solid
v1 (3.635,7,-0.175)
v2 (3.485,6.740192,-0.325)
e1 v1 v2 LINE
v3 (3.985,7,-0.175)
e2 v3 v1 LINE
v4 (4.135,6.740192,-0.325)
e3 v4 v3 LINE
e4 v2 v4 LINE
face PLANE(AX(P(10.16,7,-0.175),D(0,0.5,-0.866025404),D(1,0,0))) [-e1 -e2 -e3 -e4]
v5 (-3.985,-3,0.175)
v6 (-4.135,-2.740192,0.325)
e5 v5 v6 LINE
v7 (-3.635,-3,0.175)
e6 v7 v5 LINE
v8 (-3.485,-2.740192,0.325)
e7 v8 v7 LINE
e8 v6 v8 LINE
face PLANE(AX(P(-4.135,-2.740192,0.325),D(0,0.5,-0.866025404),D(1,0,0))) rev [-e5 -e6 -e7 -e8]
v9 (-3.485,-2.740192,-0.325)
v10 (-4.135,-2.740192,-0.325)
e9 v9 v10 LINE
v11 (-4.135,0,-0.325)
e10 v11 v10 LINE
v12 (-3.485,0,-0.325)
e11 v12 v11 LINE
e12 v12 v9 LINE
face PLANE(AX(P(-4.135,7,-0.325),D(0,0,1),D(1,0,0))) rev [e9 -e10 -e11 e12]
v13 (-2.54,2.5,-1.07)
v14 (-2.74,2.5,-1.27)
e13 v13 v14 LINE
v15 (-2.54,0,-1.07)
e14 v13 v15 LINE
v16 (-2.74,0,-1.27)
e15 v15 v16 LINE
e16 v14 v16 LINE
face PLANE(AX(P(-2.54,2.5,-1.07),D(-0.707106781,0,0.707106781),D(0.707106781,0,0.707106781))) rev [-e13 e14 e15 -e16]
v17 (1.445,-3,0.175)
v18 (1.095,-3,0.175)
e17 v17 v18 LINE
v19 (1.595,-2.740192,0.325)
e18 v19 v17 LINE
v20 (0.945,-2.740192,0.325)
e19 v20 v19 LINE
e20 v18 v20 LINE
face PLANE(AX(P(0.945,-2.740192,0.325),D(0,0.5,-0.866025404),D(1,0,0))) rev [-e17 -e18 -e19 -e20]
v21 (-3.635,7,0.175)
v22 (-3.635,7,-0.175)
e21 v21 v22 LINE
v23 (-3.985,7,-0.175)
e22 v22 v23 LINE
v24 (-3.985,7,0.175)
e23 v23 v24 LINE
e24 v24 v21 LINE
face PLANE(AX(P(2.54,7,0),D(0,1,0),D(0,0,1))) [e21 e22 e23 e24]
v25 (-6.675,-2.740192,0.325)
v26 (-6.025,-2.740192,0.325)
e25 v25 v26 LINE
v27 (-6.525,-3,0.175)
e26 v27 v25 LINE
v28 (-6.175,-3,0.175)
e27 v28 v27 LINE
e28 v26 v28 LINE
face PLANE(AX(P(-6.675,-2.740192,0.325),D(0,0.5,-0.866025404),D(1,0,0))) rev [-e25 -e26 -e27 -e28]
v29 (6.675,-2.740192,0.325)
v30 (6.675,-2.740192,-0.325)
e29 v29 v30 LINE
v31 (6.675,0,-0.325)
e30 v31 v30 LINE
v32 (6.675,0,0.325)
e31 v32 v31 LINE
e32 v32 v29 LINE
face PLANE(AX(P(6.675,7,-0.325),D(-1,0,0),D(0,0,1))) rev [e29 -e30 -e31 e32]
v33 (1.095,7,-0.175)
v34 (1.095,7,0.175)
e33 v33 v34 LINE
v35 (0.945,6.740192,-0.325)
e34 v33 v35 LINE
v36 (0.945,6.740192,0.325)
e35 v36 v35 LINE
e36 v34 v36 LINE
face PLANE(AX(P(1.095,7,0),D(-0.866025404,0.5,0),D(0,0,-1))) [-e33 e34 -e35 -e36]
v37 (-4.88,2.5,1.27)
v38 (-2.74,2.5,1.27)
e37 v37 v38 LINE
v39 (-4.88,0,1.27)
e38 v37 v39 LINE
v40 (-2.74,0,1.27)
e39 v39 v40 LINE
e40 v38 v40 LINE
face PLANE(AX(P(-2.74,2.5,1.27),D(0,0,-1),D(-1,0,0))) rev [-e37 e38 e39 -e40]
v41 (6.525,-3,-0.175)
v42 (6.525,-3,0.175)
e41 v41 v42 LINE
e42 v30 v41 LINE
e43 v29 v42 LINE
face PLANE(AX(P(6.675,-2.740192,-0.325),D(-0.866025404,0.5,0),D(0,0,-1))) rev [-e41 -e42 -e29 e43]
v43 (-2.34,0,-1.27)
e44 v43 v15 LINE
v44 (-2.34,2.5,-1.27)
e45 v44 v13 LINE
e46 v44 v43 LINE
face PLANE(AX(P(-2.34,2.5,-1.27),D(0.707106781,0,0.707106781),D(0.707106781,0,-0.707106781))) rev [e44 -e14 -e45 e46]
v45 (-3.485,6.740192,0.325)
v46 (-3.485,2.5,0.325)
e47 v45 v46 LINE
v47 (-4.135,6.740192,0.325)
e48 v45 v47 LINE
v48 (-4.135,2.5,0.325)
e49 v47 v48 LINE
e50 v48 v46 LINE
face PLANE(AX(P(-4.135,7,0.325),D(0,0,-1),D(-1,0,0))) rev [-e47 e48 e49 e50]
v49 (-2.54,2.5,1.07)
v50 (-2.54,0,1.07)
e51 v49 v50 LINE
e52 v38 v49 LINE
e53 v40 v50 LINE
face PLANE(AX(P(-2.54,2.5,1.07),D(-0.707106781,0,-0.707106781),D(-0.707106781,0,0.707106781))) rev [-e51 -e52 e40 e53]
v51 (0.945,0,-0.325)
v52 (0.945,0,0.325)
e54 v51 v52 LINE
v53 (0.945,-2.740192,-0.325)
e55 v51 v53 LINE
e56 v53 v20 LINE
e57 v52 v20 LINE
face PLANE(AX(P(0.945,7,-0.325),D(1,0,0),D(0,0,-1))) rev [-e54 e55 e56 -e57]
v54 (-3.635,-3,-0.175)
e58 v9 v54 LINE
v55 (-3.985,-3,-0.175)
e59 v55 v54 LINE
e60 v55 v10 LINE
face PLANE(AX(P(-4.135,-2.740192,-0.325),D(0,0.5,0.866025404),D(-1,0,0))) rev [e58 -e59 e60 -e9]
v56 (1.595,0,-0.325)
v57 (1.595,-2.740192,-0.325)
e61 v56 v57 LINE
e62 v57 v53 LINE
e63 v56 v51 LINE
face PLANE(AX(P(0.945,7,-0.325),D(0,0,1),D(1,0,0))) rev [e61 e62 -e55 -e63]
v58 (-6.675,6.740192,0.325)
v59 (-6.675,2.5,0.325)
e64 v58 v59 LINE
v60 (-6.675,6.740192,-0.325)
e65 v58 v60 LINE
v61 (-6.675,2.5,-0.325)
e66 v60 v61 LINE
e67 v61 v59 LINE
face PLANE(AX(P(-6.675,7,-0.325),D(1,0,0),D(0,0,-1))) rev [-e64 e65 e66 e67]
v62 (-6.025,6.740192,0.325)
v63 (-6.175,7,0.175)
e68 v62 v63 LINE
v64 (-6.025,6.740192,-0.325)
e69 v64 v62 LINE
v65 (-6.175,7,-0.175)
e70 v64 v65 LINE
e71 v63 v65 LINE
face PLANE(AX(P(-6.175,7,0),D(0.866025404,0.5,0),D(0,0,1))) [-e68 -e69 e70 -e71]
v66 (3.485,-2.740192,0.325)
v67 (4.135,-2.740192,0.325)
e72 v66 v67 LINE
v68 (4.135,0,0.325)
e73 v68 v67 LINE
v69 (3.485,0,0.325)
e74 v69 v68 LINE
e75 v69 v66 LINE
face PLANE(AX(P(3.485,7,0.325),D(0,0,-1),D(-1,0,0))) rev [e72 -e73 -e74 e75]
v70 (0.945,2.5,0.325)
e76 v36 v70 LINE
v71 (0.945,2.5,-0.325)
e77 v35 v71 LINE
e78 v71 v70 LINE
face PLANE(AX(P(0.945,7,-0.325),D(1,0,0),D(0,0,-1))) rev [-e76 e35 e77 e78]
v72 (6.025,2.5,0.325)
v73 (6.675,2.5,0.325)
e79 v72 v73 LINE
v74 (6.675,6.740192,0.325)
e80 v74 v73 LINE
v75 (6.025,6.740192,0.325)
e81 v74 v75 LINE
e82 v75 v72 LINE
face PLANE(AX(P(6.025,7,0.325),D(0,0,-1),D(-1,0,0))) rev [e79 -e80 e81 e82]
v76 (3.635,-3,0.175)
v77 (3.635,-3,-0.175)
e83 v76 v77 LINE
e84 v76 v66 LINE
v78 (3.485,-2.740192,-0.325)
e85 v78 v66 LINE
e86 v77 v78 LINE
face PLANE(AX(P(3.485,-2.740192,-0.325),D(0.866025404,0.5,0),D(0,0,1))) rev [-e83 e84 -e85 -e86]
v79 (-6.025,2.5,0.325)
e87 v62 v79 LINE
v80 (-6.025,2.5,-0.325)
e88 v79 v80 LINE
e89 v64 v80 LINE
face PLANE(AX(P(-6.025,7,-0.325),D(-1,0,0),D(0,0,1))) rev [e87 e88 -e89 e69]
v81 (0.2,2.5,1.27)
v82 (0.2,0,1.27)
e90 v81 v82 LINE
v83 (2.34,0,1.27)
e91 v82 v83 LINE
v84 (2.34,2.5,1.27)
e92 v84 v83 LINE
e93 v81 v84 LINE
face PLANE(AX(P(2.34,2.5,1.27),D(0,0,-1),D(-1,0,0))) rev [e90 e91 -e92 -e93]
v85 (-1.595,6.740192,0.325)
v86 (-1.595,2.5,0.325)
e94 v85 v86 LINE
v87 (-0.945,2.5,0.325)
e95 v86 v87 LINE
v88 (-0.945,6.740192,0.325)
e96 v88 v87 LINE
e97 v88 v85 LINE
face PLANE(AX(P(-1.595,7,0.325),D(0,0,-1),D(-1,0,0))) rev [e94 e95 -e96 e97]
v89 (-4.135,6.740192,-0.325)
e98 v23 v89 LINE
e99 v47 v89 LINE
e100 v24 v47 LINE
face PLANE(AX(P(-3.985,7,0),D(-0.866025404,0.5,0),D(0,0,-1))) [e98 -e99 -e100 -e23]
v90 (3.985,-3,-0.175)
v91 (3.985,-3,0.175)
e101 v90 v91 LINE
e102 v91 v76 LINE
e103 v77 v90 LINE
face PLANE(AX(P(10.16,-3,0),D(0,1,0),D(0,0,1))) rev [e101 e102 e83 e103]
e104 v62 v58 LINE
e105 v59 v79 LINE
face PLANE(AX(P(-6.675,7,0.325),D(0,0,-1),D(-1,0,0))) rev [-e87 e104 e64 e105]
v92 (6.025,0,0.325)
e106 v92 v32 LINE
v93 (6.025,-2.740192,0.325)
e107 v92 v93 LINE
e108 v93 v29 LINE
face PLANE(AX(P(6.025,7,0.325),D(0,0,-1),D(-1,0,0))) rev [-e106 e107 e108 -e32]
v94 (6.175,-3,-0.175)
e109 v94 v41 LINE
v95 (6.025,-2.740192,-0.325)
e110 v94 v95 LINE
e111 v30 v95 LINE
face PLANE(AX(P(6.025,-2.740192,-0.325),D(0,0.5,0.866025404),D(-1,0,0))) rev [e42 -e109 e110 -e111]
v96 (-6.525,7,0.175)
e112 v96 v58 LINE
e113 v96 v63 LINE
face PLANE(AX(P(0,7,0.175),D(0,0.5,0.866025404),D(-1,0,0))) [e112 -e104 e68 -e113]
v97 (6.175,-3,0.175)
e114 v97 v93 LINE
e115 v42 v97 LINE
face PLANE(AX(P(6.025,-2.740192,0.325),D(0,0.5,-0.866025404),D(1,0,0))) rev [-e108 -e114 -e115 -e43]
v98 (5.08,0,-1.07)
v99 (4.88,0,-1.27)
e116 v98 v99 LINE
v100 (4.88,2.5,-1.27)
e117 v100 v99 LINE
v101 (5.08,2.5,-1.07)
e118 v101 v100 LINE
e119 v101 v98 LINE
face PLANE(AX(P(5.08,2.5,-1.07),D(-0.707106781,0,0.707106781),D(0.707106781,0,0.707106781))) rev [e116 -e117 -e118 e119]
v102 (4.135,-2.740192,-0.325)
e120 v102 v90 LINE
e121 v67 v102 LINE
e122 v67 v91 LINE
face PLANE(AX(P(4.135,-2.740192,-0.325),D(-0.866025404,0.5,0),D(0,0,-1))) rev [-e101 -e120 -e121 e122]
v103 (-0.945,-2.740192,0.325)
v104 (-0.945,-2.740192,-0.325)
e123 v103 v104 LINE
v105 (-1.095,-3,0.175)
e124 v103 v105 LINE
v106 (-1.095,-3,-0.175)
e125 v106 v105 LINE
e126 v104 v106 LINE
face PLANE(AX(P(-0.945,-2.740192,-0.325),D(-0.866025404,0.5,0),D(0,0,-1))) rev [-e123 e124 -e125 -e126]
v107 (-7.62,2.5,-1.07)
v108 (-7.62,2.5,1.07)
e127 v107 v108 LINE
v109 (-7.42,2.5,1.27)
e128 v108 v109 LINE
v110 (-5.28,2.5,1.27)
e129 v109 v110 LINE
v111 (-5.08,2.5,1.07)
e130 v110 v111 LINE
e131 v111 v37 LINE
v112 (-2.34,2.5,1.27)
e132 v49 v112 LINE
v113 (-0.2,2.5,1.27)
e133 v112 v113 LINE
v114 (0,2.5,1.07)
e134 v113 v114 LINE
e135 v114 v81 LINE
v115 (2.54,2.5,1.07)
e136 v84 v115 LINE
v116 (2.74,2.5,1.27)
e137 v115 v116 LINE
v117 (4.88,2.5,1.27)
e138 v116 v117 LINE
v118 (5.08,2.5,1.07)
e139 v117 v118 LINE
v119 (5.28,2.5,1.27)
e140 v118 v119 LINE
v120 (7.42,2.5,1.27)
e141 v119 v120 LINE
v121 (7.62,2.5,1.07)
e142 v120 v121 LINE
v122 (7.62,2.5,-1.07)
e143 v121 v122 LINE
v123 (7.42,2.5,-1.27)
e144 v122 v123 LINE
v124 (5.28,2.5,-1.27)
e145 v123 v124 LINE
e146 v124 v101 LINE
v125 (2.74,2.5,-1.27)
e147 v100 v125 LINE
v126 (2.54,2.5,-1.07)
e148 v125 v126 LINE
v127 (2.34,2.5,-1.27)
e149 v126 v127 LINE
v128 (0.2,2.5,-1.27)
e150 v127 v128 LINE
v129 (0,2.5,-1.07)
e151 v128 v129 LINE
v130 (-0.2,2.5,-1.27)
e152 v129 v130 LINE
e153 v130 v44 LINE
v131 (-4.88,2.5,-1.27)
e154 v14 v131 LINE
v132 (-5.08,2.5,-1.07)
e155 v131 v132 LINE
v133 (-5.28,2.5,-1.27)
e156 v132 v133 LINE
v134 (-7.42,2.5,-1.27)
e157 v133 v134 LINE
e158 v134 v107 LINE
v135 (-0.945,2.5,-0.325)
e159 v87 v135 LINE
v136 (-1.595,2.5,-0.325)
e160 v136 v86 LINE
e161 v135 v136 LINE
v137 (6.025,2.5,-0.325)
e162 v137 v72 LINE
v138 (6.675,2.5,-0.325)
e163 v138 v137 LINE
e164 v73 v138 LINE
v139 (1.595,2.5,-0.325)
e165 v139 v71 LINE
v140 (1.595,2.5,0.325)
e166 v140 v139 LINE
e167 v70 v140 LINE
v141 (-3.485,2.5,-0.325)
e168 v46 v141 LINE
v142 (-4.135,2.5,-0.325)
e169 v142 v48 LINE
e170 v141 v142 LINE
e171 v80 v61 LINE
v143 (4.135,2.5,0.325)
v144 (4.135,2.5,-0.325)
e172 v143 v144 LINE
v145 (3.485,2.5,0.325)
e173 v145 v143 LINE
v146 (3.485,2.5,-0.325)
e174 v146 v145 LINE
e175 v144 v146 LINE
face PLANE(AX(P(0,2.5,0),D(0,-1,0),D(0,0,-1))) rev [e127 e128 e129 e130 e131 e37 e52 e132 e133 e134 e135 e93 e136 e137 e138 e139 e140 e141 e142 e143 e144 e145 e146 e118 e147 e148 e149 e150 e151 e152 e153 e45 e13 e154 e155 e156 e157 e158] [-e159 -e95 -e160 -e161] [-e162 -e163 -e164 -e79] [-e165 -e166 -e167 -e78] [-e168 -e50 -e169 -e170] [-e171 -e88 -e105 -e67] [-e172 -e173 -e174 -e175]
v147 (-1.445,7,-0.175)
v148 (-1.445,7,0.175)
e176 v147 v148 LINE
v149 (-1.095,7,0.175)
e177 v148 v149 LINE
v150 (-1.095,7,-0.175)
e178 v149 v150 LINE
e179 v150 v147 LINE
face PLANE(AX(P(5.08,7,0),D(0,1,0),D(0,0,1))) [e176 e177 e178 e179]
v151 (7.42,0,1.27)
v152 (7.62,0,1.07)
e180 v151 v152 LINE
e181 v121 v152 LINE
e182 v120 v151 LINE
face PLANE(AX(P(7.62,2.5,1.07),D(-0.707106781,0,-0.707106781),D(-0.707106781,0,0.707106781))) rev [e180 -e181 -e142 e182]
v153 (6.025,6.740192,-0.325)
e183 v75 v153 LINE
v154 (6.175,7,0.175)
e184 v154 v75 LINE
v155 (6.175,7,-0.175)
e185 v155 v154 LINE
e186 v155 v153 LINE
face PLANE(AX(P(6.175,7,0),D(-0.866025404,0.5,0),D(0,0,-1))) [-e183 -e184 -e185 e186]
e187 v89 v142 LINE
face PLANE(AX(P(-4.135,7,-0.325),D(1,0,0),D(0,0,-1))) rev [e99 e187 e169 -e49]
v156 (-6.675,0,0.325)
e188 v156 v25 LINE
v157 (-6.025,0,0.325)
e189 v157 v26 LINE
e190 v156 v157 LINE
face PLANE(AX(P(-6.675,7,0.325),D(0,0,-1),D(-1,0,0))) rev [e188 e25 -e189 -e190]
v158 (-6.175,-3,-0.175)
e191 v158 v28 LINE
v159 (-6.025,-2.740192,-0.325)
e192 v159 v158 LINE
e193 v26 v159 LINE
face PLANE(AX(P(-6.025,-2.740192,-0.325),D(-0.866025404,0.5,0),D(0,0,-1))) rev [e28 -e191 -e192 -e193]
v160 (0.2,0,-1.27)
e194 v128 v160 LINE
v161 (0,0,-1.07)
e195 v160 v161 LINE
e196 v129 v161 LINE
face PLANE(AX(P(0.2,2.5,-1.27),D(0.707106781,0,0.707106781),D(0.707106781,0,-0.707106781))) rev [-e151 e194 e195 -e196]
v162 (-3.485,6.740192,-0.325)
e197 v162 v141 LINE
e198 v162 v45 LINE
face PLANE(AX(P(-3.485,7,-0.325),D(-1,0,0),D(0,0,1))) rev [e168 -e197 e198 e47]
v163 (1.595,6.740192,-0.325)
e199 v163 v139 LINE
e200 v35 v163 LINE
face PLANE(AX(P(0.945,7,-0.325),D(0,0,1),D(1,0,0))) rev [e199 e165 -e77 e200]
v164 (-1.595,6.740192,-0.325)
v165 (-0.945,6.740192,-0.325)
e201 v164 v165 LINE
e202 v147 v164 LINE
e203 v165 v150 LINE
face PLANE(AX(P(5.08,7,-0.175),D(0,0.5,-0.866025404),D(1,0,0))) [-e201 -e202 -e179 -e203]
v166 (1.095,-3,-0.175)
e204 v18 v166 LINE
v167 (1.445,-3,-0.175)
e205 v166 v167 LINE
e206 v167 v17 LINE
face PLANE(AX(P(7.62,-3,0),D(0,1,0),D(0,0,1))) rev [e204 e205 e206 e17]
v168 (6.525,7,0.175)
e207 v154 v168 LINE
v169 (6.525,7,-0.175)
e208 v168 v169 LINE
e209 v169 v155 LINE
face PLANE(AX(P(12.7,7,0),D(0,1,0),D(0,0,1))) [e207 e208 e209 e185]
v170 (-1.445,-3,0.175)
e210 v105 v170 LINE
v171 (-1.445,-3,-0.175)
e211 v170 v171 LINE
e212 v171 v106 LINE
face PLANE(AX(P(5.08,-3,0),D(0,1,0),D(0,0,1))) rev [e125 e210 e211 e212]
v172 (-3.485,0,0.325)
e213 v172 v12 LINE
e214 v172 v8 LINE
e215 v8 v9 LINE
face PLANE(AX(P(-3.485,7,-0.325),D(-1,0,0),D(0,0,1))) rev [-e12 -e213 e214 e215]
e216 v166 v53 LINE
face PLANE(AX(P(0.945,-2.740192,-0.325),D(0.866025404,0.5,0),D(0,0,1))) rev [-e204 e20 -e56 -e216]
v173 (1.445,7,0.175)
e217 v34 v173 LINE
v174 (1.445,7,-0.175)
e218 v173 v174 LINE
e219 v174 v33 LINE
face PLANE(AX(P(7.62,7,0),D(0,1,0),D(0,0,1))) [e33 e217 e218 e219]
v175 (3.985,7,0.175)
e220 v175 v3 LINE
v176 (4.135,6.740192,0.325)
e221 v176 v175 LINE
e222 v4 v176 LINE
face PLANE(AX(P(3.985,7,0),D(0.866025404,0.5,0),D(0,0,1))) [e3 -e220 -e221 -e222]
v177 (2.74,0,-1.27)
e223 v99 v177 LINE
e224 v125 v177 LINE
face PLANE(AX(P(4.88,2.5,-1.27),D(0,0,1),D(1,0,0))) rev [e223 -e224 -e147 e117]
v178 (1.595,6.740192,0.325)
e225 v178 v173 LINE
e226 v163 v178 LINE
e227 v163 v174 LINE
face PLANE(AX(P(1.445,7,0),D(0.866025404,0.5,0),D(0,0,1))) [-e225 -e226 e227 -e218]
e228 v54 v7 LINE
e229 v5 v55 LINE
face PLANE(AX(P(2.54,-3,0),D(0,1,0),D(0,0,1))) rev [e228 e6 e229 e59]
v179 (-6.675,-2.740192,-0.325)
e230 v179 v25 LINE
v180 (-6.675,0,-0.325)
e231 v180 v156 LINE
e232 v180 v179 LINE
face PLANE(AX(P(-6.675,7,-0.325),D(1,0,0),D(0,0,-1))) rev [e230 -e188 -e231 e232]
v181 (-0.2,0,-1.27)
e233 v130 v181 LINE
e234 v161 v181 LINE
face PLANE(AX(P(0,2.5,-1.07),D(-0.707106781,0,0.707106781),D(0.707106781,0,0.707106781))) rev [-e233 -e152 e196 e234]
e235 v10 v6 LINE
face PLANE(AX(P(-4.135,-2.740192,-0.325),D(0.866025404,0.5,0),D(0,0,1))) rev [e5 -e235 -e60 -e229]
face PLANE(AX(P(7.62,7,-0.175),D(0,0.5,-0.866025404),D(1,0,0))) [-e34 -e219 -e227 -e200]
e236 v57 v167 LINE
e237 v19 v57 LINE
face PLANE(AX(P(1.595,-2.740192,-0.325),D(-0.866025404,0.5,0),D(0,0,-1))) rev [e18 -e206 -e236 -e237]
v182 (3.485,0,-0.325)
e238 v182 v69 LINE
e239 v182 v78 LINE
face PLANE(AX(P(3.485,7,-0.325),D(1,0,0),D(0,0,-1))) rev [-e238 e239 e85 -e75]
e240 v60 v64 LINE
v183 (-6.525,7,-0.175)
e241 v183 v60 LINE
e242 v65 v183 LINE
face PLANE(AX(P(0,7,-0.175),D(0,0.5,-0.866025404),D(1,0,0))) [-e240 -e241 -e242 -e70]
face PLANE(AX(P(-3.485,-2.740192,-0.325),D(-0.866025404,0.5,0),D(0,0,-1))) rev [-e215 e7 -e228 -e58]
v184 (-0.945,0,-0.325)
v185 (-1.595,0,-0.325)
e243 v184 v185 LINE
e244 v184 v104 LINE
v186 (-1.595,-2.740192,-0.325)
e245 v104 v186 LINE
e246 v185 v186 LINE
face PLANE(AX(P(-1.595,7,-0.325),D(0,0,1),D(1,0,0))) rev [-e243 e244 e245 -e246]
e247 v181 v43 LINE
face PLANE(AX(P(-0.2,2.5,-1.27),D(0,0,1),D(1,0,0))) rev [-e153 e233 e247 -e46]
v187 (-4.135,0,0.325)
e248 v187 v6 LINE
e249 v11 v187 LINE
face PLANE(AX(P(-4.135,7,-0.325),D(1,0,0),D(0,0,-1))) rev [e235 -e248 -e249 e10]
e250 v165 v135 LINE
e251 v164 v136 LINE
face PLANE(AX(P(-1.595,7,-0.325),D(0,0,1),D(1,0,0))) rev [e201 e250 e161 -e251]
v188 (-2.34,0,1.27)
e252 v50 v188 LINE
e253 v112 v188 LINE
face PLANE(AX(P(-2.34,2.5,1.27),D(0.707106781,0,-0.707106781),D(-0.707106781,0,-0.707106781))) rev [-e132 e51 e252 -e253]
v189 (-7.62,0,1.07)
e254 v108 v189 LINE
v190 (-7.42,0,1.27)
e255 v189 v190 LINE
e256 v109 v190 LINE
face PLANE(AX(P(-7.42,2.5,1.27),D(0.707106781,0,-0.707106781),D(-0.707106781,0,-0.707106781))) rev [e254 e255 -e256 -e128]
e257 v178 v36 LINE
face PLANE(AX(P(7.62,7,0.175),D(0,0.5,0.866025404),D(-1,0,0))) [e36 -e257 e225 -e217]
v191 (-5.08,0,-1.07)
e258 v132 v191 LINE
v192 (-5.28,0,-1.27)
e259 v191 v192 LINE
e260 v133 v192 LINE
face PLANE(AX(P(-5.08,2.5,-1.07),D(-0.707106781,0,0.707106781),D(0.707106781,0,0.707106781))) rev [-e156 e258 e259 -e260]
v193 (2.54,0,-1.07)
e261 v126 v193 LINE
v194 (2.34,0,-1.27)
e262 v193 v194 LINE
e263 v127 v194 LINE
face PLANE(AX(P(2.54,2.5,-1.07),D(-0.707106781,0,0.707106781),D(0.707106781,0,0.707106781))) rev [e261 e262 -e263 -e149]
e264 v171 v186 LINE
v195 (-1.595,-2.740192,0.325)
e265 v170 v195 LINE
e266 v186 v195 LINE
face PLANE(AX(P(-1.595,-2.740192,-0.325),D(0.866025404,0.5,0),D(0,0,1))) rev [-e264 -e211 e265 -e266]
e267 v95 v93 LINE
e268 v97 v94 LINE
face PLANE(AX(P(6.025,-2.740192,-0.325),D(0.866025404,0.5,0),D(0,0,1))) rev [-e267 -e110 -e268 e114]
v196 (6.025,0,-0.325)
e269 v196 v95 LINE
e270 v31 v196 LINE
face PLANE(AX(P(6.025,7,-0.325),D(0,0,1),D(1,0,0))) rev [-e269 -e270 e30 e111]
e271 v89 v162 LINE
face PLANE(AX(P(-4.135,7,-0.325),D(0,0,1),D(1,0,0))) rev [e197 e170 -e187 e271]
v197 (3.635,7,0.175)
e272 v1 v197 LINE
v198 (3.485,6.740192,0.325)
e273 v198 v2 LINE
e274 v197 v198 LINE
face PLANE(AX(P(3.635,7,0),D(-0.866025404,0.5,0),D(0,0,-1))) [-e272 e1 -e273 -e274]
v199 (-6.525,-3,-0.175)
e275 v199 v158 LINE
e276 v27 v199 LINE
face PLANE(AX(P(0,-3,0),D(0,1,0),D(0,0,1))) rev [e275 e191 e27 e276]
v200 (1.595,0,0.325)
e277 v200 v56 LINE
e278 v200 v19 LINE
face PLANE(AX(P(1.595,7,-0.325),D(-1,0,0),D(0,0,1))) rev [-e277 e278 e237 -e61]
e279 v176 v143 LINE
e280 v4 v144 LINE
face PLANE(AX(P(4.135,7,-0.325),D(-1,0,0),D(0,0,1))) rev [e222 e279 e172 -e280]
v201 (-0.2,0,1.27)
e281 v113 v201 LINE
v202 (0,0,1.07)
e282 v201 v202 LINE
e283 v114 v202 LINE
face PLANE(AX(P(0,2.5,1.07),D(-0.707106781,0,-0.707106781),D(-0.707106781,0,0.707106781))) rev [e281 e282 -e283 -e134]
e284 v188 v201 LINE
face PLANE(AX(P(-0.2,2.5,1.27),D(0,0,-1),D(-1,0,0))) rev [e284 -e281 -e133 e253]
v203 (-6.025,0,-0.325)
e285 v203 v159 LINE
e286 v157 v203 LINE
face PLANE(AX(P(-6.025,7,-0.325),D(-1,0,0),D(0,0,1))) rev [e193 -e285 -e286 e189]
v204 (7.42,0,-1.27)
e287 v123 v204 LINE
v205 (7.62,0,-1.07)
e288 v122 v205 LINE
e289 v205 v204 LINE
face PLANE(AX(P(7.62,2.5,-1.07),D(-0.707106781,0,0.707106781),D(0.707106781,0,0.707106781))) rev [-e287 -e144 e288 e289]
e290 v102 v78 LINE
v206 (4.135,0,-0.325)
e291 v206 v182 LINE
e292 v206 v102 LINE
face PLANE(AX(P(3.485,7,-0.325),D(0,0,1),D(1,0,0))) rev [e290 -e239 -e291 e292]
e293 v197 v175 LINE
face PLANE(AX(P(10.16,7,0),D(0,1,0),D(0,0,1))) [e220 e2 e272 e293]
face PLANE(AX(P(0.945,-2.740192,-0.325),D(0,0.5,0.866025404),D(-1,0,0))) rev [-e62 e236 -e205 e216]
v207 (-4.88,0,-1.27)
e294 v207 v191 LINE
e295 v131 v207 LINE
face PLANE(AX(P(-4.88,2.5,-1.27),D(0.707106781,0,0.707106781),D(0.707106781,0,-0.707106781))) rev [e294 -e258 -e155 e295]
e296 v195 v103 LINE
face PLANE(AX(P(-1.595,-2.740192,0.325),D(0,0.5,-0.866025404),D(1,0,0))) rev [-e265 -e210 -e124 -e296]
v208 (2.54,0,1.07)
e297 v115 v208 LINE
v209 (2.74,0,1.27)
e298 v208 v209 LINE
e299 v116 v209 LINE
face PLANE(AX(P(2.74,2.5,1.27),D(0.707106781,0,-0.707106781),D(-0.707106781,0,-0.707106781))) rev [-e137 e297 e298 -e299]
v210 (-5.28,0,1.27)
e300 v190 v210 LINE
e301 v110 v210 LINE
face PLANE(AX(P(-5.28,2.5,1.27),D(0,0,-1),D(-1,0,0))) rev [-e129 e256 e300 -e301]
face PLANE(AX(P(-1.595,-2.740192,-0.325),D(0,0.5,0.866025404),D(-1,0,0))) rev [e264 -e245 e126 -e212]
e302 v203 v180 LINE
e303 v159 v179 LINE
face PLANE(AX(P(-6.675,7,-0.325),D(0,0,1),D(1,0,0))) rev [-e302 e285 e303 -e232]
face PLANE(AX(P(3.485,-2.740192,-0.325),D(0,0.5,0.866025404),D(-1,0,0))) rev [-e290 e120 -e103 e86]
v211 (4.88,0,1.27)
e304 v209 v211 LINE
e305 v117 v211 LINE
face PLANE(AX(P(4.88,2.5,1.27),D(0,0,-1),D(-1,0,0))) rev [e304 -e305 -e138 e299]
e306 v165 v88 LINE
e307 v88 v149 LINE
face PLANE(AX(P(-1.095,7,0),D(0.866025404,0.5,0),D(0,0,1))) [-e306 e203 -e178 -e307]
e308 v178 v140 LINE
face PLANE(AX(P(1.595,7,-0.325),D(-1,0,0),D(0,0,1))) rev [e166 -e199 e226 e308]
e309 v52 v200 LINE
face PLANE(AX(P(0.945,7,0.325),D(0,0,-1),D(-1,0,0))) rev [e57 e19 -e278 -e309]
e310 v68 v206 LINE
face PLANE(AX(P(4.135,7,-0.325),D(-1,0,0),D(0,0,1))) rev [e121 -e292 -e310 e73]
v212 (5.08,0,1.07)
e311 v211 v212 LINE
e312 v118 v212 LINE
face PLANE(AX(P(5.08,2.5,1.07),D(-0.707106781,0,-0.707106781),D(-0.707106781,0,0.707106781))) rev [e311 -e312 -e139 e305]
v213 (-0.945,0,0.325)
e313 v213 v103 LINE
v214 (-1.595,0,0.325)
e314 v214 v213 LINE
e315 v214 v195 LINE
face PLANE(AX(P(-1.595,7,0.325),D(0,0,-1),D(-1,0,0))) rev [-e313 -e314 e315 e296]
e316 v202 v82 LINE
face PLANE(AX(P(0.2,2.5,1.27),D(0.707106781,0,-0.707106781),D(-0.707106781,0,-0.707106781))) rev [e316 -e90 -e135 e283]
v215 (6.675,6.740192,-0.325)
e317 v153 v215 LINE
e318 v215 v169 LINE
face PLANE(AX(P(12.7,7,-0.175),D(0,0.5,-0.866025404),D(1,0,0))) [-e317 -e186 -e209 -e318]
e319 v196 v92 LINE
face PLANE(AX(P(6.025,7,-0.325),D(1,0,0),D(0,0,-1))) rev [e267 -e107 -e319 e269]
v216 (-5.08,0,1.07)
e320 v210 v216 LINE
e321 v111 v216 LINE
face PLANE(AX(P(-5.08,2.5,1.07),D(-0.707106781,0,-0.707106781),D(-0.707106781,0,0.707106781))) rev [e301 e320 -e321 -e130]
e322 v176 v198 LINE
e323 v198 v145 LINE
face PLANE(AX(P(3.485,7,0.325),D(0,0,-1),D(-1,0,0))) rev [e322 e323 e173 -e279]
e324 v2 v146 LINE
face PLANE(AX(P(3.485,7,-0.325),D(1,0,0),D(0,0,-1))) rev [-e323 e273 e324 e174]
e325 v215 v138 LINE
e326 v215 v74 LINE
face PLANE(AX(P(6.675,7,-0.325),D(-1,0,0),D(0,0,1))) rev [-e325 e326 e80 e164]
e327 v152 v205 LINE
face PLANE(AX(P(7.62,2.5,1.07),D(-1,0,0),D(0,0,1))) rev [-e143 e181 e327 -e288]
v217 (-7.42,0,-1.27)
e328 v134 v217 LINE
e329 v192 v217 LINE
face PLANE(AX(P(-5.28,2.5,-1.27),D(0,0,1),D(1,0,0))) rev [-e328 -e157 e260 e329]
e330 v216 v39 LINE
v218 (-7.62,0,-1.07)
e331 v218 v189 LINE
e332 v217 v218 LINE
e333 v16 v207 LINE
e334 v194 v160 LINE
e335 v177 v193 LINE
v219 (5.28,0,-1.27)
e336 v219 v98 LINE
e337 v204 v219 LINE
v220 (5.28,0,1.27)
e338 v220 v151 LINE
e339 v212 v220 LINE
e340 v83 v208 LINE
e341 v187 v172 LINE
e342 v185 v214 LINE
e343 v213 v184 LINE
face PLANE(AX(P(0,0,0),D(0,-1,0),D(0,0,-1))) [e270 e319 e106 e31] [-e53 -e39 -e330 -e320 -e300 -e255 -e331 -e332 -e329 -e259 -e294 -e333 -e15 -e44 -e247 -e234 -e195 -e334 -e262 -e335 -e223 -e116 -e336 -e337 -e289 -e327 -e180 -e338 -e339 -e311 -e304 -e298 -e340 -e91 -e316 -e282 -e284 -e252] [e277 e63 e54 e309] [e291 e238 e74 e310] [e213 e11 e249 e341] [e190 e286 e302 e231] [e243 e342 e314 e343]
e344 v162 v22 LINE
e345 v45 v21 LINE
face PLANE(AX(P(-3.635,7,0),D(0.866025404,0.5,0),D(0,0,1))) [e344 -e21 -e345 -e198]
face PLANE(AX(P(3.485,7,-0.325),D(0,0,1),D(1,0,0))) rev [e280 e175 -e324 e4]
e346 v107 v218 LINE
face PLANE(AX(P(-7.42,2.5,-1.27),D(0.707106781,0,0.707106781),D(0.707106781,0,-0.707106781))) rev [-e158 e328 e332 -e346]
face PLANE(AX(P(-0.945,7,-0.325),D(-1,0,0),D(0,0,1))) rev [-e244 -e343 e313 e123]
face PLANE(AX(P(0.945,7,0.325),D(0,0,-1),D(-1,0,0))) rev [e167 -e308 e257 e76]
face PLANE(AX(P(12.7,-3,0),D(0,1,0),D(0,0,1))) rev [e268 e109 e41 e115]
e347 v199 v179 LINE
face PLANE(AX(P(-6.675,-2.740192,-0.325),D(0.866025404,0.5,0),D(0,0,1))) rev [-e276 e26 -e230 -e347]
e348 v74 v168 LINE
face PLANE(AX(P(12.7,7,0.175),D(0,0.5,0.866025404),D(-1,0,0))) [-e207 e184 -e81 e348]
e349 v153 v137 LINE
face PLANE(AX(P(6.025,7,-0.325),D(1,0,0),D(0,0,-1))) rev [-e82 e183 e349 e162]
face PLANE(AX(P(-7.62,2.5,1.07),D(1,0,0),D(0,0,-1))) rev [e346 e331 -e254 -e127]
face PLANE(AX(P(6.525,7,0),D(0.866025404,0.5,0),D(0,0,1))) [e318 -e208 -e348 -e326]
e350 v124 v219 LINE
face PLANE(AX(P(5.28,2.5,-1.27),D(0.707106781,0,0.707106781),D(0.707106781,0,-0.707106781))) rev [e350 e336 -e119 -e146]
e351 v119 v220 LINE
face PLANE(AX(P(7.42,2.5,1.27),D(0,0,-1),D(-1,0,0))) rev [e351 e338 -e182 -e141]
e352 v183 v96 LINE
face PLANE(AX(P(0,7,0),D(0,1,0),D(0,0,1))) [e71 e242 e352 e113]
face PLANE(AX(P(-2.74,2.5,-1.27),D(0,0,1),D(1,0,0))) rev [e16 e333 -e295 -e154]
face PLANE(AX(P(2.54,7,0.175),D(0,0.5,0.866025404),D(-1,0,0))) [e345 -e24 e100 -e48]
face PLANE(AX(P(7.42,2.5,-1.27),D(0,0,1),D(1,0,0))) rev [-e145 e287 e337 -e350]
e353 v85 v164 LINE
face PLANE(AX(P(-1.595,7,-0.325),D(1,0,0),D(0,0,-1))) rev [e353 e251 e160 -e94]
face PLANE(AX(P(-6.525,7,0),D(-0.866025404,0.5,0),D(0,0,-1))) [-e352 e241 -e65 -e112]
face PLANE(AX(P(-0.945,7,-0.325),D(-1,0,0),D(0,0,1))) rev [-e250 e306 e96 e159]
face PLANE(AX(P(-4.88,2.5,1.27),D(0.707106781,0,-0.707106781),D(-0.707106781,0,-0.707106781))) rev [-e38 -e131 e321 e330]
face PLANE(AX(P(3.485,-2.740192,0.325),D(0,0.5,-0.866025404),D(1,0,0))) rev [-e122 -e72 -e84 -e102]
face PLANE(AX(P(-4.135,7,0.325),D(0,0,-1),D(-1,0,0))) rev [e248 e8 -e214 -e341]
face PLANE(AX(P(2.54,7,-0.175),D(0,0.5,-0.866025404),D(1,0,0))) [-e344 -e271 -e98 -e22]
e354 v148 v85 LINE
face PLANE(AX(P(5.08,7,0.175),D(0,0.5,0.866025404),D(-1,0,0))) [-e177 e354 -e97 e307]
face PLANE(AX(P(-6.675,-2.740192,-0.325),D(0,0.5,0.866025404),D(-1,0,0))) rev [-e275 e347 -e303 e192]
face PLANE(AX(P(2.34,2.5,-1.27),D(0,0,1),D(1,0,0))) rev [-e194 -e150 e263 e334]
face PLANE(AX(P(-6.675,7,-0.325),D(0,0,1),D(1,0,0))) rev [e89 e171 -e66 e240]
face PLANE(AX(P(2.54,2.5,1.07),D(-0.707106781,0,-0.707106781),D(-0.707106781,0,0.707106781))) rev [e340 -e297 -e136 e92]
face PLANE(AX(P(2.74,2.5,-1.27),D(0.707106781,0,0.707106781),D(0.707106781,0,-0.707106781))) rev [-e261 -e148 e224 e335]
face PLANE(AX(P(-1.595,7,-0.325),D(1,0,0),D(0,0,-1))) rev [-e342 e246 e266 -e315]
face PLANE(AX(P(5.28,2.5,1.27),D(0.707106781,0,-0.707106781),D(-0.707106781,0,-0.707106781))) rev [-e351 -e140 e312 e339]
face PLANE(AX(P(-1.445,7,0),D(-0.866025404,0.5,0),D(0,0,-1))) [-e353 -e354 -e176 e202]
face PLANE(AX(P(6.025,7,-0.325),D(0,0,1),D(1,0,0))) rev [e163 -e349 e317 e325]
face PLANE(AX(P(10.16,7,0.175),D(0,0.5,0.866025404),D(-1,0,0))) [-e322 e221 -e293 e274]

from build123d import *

# Parameters (mm, degrees)
BOSS_EXTRUDE1_DEPTH   = 2.5
SKETCH3_W             = 0.65
SKETCH3_H             = 0.65
BOSS_EXTRUDE2_DEPTH   = 10
CHAMFER2_SIZE         = 0.15
CHAMFER2_SIZE2        = 0.259807621
CHAMFER3_SIZE         = 0.15
CHAMFER3_SIZE2        = 0.259807621
LPATTERN2_DEPTH       = 2.5
LPATTERN2_START       = -2.740192379
LPATTERN2_2_OUTLINE_W = 0.65
LPATTERN2_2_OUTLINE_H = 0.65
LPATTERN2_2_DEPTH     = 9.480384758


with BuildPart() as part:
    # Sketch1 → Boss-Extrude1 (new body)
    with BuildSketch(Plane(origin=(0, 0, 0), x_dir=(1, 0, 0), z_dir=(0, 1, 0))):
        Polygon((-7.42, 1.27), (-7.62, 1.07), (-7.62, -1.07), (-7.42, -1.27), (-5.28, -1.27), (-5.08, -1.07), (-5.08, 1.07), (-5.28, 1.27), align=None)
    extrude(amount=BOSS_EXTRUDE1_DEPTH)

    # Sketch3 → Boss-Extrude2 (add)
    with BuildSketch(Plane(origin=(0, -3, 0), x_dir=(1, 0, 0), z_dir=(0, 1, 0))):
        with Locations((-6.35, 0)):
            Rectangle(SKETCH3_W, SKETCH3_H)
    extrude(amount=BOSS_EXTRUDE2_DEPTH)

    # Chamfer2
    chamfer2_edges = [part.edges().sort_by_distance(p)[0] for p in [
        (-6.025, -3, 0),
        (-6.35, -3, -0.325),
        (-6.675, -3, 0),
        (-6.35, -3, 0.325),
    ]]
    chamfer2_side = [part.faces().sort_by_distance(p)[0] for p in [
        (-6.35, -3, 0),
    ]]
    chamfer(chamfer2_edges, length=CHAMFER2_SIZE, length2=CHAMFER2_SIZE2, reference=chamfer2_side[0])

    # Chamfer3
    chamfer3_edges = [part.edges().sort_by_distance(p)[0] for p in [
        (-6.025, 7, 0),
        (-6.35, 7, -0.325),
        (-6.675, 7, 0),
        (-6.35, 7, 0.325),
    ]]
    chamfer3_side = [part.faces().sort_by_distance(p)[0] for p in [
        (-6.35, 7, 0),
    ]]
    chamfer(chamfer3_edges, length=CHAMFER3_SIZE, length2=CHAMFER3_SIZE2, reference=chamfer3_side[0])

    # LPattern2: read off the stored shape, not the designer's step
    # LPattern2 outline → LPattern2 (add)
    with BuildSketch(Plane(origin=(0, 0, 0), x_dir=(1, 0, 0), z_dir=(0, 1, 0))):
        Polygon((-2.74, 1.27), (-4.88, 1.27), (-5.08, 1.07), (-5.08, -1.07), (-4.88, -1.27), (-2.74, -1.27), (-2.54, -1.07), (-2.34, -1.27), (-0.2, -1.27), (0, -1.07), (0.2, -1.27), (2.34, -1.27), (2.54, -1.07), (2.74, -1.27), (4.88, -1.27), (5.08, -1.07), (5.28, -1.27), (7.42, -1.27), (7.62, -1.07), (7.62, 1.07), (7.42, 1.27), (5.28, 1.27), (5.08, 1.07), (4.88, 1.27), (2.74, 1.27), (2.54, 1.07), (2.34, 1.27), (0.2, 1.27), (0, 1.07), (-0.2, 1.27), (-2.34, 1.27), (-2.54, 1.07), align=None)
    extrude(amount=LPATTERN2_DEPTH)

    # LPattern2 2 outline → LPattern2 2 (add)
    with BuildSketch(Plane(origin=(0, 0, 0), x_dir=(1, 0, 0), z_dir=(0, 1, 0)).offset(LPATTERN2_START)):
        with Locations((-3.81, 0)):
            Rectangle(LPATTERN2_2_OUTLINE_W, LPATTERN2_2_OUTLINE_H)
        with Locations((-1.27, 0)):
            Rectangle(LPATTERN2_2_OUTLINE_W, LPATTERN2_2_OUTLINE_H)
        with Locations((1.27, 0)):
            Rectangle(LPATTERN2_2_OUTLINE_W, LPATTERN2_2_OUTLINE_H)
        with Locations((3.81, 0)):
            Rectangle(LPATTERN2_2_OUTLINE_W, LPATTERN2_2_OUTLINE_H)
        with Locations((6.35, 0)):
            Rectangle(LPATTERN2_2_OUTLINE_W, LPATTERN2_2_OUTLINE_H)
    extrude(amount=LPATTERN2_2_DEPTH)

    # LPattern2 3: loft between two sections, ruled curve by curve
    lpattern2_3_from = [
        Edge.make_line((-3.985, -3, 0.175), (-3.635, -3, 0.175)),
        Edge.make_line((-3.635, -3, -0.175), (-3.985, -3, -0.175)),
        Edge.make_line((-3.635, -3, 0.175), (-3.635, -3, -0.175)),
        Edge.make_line((-3.985, -3, 0.175), (-3.985, -3, -0.175)),
    ]
    lpattern2_3_to = [
        Edge.make_line((-4.135, -2.740192379, 0.325), (-3.485, -2.740192379, 0.325)),
        Edge.make_line((-3.485, -2.740192379, -0.325), (-4.135, -2.740192379, -0.325)),
        Edge.make_line((-3.485, -2.740192379, 0.325), (-3.485, -2.740192379, -0.325)),
        Edge.make_line((-4.135, -2.740192379, 0.325), (-4.135, -2.740192379, -0.325)),
    ]
    lpattern2_3 = Solid(Shell([*[Face.make_surface_from_curves(lpattern2_3_from[k], lpattern2_3_to[k]) for k in range(4)], Face(Wire(lpattern2_3_from)), Face(Wire(lpattern2_3_to))]))
    add(lpattern2_3)

    # LPattern2 4: loft between two sections, ruled curve by curve
    lpattern2_4_from = [
        Edge.make_line((-1.445, -3, 0.175), (-1.095, -3, 0.175)),
        Edge.make_line((-1.095, -3, -0.175), (-1.445, -3, -0.175)),
        Edge.make_line((-1.095, -3, 0.175), (-1.095, -3, -0.175)),
        Edge.make_line((-1.445, -3, 0.175), (-1.445, -3, -0.175)),
    ]
    lpattern2_4_to = [
        Edge.make_line((-1.595, -2.740192379, 0.325), (-0.945, -2.740192379, 0.325)),
        Edge.make_line((-0.945, -2.740192379, -0.325), (-1.595, -2.740192379, -0.325)),
        Edge.make_line((-0.945, -2.740192379, 0.325), (-0.945, -2.740192379, -0.325)),
        Edge.make_line((-1.595, -2.740192379, 0.325), (-1.595, -2.740192379, -0.325)),
    ]
    lpattern2_4 = Solid(Shell([*[Face.make_surface_from_curves(lpattern2_4_from[k], lpattern2_4_to[k]) for k in range(4)], Face(Wire(lpattern2_4_from)), Face(Wire(lpattern2_4_to))]))
    add(lpattern2_4)

    # LPattern2 5: loft between two sections, ruled curve by curve
    lpattern2_5_from = [
        Edge.make_line((1.095, -3, 0.175), (1.445, -3, 0.175)),
        Edge.make_line((1.445, -3, -0.175), (1.095, -3, -0.175)),
        Edge.make_line((1.445, -3, 0.175), (1.445, -3, -0.175)),
        Edge.make_line((1.095, -3, 0.175), (1.095, -3, -0.175)),
    ]
    lpattern2_5_to = [
        Edge.make_line((0.945, -2.740192379, 0.325), (1.595, -2.740192379, 0.325)),
        Edge.make_line((1.595, -2.740192379, -0.325), (0.945, -2.740192379, -0.325)),
        Edge.make_line((1.595, -2.740192379, 0.325), (1.595, -2.740192379, -0.325)),
        Edge.make_line((0.945, -2.740192379, 0.325), (0.945, -2.740192379, -0.325)),
    ]
    lpattern2_5 = Solid(Shell([*[Face.make_surface_from_curves(lpattern2_5_from[k], lpattern2_5_to[k]) for k in range(4)], Face(Wire(lpattern2_5_from)), Face(Wire(lpattern2_5_to))]))
    add(lpattern2_5)

    # LPattern2 6: loft between two sections, ruled curve by curve
    lpattern2_6_from = [
        Edge.make_line((3.635, -3, 0.175), (3.985, -3, 0.175)),
        Edge.make_line((3.985, -3, -0.175), (3.635, -3, -0.175)),
        Edge.make_line((3.985, -3, 0.175), (3.985, -3, -0.175)),
        Edge.make_line((3.635, -3, 0.175), (3.635, -3, -0.175)),
    ]
    lpattern2_6_to = [
        Edge.make_line((3.485, -2.740192379, 0.325), (4.135, -2.740192379, 0.325)),
        Edge.make_line((4.135, -2.740192379, -0.325), (3.485, -2.740192379, -0.325)),
        Edge.make_line((4.135, -2.740192379, 0.325), (4.135, -2.740192379, -0.325)),
        Edge.make_line((3.485, -2.740192379, 0.325), (3.485, -2.740192379, -0.325)),
    ]
    lpattern2_6 = Solid(Shell([*[Face.make_surface_from_curves(lpattern2_6_from[k], lpattern2_6_to[k]) for k in range(4)], Face(Wire(lpattern2_6_from)), Face(Wire(lpattern2_6_to))]))
    add(lpattern2_6)

    # LPattern2 7: loft between two sections, ruled curve by curve
    lpattern2_7_from = [
        Edge.make_line((6.175, -3, 0.175), (6.525, -3, 0.175)),
        Edge.make_line((6.525, -3, -0.175), (6.175, -3, -0.175)),
        Edge.make_line((6.525, -3, 0.175), (6.525, -3, -0.175)),
        Edge.make_line((6.175, -3, 0.175), (6.175, -3, -0.175)),
    ]
    lpattern2_7_to = [
        Edge.make_line((6.025, -2.740192379, 0.325), (6.675, -2.740192379, 0.325)),
        Edge.make_line((6.675, -2.740192379, -0.325), (6.025, -2.740192379, -0.325)),
        Edge.make_line((6.675, -2.740192379, 0.325), (6.675, -2.740192379, -0.325)),
        Edge.make_line((6.025, -2.740192379, 0.325), (6.025, -2.740192379, -0.325)),
    ]
    lpattern2_7 = Solid(Shell([*[Face.make_surface_from_curves(lpattern2_7_from[k], lpattern2_7_to[k]) for k in range(4)], Face(Wire(lpattern2_7_from)), Face(Wire(lpattern2_7_to))]))
    add(lpattern2_7)

    # LPattern2 8: loft between two sections, ruled curve by curve
    lpattern2_8_from = [
        Edge.make_line((-3.485, 6.740192379, -0.325), (-4.135, 6.740192379, -0.325)),
        Edge.make_line((-4.135, 6.740192379, 0.325), (-3.485, 6.740192379, 0.325)),
        Edge.make_line((-4.135, 6.740192379, -0.325), (-4.135, 6.740192379, 0.325)),
        Edge.make_line((-3.485, 6.740192379, -0.325), (-3.485, 6.740192379, 0.325)),
    ]
    lpattern2_8_to = [
        Edge.make_line((-3.635, 7, -0.175), (-3.985, 7, -0.175)),
        Edge.make_line((-3.985, 7, 0.175), (-3.635, 7, 0.175)),
        Edge.make_line((-3.985, 7, -0.175), (-3.985, 7, 0.175)),
        Edge.make_line((-3.635, 7, -0.175), (-3.635, 7, 0.175)),
    ]
    lpattern2_8 = Solid(Shell([*[Face.make_surface_from_curves(lpattern2_8_from[k], lpattern2_8_to[k]) for k in range(4)], Face(Wire(lpattern2_8_from)), Face(Wire(lpattern2_8_to))]))
    add(lpattern2_8)

    # LPattern2 9: loft between two sections, ruled curve by curve
    lpattern2_9_from = [
        Edge.make_line((-0.945, 6.740192379, -0.325), (-1.595, 6.740192379, -0.325)),
        Edge.make_line((-1.595, 6.740192379, 0.325), (-0.945, 6.740192379, 0.325)),
        Edge.make_line((-1.595, 6.740192379, -0.325), (-1.595, 6.740192379, 0.325)),
        Edge.make_line((-0.945, 6.740192379, -0.325), (-0.945, 6.740192379, 0.325)),
    ]
    lpattern2_9_to = [
        Edge.make_line((-1.095, 7, -0.175), (-1.445, 7, -0.175)),
        Edge.make_line((-1.445, 7, 0.175), (-1.095, 7, 0.175)),
        Edge.make_line((-1.445, 7, -0.175), (-1.445, 7, 0.175)),
        Edge.make_line((-1.095, 7, -0.175), (-1.095, 7, 0.175)),
    ]
    lpattern2_9 = Solid(Shell([*[Face.make_surface_from_curves(lpattern2_9_from[k], lpattern2_9_to[k]) for k in range(4)], Face(Wire(lpattern2_9_from)), Face(Wire(lpattern2_9_to))]))
    add(lpattern2_9)

    # LPattern2 10: loft between two sections, ruled curve by curve
    lpattern2_10_from = [
        Edge.make_line((1.595, 6.740192379, -0.325), (0.945, 6.740192379, -0.325)),
        Edge.make_line((0.945, 6.740192379, 0.325), (1.595, 6.740192379, 0.325)),
        Edge.make_line((0.945, 6.740192379, -0.325), (0.945, 6.740192379, 0.325)),
        Edge.make_line((1.595, 6.740192379, -0.325), (1.595, 6.740192379, 0.325)),
    ]
    lpattern2_10_to = [
        Edge.make_line((1.445, 7, -0.175), (1.095, 7, -0.175)),
        Edge.make_line((1.095, 7, 0.175), (1.445, 7, 0.175)),
        Edge.make_line((1.095, 7, -0.175), (1.095, 7, 0.175)),
        Edge.make_line((1.445, 7, -0.175), (1.445, 7, 0.175)),
    ]
    lpattern2_10 = Solid(Shell([*[Face.make_surface_from_curves(lpattern2_10_from[k], lpattern2_10_to[k]) for k in range(4)], Face(Wire(lpattern2_10_from)), Face(Wire(lpattern2_10_to))]))
    add(lpattern2_10)

    # LPattern2 11: loft between two sections, ruled curve by curve
    lpattern2_11_from = [
        Edge.make_line((4.135, 6.740192379, -0.325), (3.485, 6.740192379, -0.325)),
        Edge.make_line((3.485, 6.740192379, 0.325), (4.135, 6.740192379, 0.325)),
        Edge.make_line((3.485, 6.740192379, -0.325), (3.485, 6.740192379, 0.325)),
        Edge.make_line((4.135, 6.740192379, -0.325), (4.135, 6.740192379, 0.325)),
    ]
    lpattern2_11_to = [
        Edge.make_line((3.985, 7, -0.175), (3.635, 7, -0.175)),
        Edge.make_line((3.635, 7, 0.175), (3.985, 7, 0.175)),
        Edge.make_line((3.635, 7, -0.175), (3.635, 7, 0.175)),
        Edge.make_line((3.985, 7, -0.175), (3.985, 7, 0.175)),
    ]
    lpattern2_11 = Solid(Shell([*[Face.make_surface_from_curves(lpattern2_11_from[k], lpattern2_11_to[k]) for k in range(4)], Face(Wire(lpattern2_11_from)), Face(Wire(lpattern2_11_to))]))
    add(lpattern2_11)

    # LPattern2 12: loft between two sections, ruled curve by curve
    lpattern2_12_from = [
        Edge.make_line((6.675, 6.740192379, -0.325), (6.025, 6.740192379, -0.325)),
        Edge.make_line((6.025, 6.740192379, 0.325), (6.675, 6.740192379, 0.325)),
        Edge.make_line((6.025, 6.740192379, -0.325), (6.025, 6.740192379, 0.325)),
        Edge.make_line((6.675, 6.740192379, -0.325), (6.675, 6.740192379, 0.325)),
    ]
    lpattern2_12_to = [
        Edge.make_line((6.525, 7, -0.175), (6.175, 7, -0.175)),
        Edge.make_line((6.175, 7, 0.175), (6.525, 7, 0.175)),
        Edge.make_line((6.175, 7, -0.175), (6.175, 7, 0.175)),
        Edge.make_line((6.525, 7, -0.175), (6.525, 7, 0.175)),
    ]
    lpattern2_12 = Solid(Shell([*[Face.make_surface_from_curves(lpattern2_12_from[k], lpattern2_12_to[k]) for k in range(4)], Face(Wire(lpattern2_12_from)), Face(Wire(lpattern2_12_to))]))
    add(lpattern2_12)


solid = part.part
